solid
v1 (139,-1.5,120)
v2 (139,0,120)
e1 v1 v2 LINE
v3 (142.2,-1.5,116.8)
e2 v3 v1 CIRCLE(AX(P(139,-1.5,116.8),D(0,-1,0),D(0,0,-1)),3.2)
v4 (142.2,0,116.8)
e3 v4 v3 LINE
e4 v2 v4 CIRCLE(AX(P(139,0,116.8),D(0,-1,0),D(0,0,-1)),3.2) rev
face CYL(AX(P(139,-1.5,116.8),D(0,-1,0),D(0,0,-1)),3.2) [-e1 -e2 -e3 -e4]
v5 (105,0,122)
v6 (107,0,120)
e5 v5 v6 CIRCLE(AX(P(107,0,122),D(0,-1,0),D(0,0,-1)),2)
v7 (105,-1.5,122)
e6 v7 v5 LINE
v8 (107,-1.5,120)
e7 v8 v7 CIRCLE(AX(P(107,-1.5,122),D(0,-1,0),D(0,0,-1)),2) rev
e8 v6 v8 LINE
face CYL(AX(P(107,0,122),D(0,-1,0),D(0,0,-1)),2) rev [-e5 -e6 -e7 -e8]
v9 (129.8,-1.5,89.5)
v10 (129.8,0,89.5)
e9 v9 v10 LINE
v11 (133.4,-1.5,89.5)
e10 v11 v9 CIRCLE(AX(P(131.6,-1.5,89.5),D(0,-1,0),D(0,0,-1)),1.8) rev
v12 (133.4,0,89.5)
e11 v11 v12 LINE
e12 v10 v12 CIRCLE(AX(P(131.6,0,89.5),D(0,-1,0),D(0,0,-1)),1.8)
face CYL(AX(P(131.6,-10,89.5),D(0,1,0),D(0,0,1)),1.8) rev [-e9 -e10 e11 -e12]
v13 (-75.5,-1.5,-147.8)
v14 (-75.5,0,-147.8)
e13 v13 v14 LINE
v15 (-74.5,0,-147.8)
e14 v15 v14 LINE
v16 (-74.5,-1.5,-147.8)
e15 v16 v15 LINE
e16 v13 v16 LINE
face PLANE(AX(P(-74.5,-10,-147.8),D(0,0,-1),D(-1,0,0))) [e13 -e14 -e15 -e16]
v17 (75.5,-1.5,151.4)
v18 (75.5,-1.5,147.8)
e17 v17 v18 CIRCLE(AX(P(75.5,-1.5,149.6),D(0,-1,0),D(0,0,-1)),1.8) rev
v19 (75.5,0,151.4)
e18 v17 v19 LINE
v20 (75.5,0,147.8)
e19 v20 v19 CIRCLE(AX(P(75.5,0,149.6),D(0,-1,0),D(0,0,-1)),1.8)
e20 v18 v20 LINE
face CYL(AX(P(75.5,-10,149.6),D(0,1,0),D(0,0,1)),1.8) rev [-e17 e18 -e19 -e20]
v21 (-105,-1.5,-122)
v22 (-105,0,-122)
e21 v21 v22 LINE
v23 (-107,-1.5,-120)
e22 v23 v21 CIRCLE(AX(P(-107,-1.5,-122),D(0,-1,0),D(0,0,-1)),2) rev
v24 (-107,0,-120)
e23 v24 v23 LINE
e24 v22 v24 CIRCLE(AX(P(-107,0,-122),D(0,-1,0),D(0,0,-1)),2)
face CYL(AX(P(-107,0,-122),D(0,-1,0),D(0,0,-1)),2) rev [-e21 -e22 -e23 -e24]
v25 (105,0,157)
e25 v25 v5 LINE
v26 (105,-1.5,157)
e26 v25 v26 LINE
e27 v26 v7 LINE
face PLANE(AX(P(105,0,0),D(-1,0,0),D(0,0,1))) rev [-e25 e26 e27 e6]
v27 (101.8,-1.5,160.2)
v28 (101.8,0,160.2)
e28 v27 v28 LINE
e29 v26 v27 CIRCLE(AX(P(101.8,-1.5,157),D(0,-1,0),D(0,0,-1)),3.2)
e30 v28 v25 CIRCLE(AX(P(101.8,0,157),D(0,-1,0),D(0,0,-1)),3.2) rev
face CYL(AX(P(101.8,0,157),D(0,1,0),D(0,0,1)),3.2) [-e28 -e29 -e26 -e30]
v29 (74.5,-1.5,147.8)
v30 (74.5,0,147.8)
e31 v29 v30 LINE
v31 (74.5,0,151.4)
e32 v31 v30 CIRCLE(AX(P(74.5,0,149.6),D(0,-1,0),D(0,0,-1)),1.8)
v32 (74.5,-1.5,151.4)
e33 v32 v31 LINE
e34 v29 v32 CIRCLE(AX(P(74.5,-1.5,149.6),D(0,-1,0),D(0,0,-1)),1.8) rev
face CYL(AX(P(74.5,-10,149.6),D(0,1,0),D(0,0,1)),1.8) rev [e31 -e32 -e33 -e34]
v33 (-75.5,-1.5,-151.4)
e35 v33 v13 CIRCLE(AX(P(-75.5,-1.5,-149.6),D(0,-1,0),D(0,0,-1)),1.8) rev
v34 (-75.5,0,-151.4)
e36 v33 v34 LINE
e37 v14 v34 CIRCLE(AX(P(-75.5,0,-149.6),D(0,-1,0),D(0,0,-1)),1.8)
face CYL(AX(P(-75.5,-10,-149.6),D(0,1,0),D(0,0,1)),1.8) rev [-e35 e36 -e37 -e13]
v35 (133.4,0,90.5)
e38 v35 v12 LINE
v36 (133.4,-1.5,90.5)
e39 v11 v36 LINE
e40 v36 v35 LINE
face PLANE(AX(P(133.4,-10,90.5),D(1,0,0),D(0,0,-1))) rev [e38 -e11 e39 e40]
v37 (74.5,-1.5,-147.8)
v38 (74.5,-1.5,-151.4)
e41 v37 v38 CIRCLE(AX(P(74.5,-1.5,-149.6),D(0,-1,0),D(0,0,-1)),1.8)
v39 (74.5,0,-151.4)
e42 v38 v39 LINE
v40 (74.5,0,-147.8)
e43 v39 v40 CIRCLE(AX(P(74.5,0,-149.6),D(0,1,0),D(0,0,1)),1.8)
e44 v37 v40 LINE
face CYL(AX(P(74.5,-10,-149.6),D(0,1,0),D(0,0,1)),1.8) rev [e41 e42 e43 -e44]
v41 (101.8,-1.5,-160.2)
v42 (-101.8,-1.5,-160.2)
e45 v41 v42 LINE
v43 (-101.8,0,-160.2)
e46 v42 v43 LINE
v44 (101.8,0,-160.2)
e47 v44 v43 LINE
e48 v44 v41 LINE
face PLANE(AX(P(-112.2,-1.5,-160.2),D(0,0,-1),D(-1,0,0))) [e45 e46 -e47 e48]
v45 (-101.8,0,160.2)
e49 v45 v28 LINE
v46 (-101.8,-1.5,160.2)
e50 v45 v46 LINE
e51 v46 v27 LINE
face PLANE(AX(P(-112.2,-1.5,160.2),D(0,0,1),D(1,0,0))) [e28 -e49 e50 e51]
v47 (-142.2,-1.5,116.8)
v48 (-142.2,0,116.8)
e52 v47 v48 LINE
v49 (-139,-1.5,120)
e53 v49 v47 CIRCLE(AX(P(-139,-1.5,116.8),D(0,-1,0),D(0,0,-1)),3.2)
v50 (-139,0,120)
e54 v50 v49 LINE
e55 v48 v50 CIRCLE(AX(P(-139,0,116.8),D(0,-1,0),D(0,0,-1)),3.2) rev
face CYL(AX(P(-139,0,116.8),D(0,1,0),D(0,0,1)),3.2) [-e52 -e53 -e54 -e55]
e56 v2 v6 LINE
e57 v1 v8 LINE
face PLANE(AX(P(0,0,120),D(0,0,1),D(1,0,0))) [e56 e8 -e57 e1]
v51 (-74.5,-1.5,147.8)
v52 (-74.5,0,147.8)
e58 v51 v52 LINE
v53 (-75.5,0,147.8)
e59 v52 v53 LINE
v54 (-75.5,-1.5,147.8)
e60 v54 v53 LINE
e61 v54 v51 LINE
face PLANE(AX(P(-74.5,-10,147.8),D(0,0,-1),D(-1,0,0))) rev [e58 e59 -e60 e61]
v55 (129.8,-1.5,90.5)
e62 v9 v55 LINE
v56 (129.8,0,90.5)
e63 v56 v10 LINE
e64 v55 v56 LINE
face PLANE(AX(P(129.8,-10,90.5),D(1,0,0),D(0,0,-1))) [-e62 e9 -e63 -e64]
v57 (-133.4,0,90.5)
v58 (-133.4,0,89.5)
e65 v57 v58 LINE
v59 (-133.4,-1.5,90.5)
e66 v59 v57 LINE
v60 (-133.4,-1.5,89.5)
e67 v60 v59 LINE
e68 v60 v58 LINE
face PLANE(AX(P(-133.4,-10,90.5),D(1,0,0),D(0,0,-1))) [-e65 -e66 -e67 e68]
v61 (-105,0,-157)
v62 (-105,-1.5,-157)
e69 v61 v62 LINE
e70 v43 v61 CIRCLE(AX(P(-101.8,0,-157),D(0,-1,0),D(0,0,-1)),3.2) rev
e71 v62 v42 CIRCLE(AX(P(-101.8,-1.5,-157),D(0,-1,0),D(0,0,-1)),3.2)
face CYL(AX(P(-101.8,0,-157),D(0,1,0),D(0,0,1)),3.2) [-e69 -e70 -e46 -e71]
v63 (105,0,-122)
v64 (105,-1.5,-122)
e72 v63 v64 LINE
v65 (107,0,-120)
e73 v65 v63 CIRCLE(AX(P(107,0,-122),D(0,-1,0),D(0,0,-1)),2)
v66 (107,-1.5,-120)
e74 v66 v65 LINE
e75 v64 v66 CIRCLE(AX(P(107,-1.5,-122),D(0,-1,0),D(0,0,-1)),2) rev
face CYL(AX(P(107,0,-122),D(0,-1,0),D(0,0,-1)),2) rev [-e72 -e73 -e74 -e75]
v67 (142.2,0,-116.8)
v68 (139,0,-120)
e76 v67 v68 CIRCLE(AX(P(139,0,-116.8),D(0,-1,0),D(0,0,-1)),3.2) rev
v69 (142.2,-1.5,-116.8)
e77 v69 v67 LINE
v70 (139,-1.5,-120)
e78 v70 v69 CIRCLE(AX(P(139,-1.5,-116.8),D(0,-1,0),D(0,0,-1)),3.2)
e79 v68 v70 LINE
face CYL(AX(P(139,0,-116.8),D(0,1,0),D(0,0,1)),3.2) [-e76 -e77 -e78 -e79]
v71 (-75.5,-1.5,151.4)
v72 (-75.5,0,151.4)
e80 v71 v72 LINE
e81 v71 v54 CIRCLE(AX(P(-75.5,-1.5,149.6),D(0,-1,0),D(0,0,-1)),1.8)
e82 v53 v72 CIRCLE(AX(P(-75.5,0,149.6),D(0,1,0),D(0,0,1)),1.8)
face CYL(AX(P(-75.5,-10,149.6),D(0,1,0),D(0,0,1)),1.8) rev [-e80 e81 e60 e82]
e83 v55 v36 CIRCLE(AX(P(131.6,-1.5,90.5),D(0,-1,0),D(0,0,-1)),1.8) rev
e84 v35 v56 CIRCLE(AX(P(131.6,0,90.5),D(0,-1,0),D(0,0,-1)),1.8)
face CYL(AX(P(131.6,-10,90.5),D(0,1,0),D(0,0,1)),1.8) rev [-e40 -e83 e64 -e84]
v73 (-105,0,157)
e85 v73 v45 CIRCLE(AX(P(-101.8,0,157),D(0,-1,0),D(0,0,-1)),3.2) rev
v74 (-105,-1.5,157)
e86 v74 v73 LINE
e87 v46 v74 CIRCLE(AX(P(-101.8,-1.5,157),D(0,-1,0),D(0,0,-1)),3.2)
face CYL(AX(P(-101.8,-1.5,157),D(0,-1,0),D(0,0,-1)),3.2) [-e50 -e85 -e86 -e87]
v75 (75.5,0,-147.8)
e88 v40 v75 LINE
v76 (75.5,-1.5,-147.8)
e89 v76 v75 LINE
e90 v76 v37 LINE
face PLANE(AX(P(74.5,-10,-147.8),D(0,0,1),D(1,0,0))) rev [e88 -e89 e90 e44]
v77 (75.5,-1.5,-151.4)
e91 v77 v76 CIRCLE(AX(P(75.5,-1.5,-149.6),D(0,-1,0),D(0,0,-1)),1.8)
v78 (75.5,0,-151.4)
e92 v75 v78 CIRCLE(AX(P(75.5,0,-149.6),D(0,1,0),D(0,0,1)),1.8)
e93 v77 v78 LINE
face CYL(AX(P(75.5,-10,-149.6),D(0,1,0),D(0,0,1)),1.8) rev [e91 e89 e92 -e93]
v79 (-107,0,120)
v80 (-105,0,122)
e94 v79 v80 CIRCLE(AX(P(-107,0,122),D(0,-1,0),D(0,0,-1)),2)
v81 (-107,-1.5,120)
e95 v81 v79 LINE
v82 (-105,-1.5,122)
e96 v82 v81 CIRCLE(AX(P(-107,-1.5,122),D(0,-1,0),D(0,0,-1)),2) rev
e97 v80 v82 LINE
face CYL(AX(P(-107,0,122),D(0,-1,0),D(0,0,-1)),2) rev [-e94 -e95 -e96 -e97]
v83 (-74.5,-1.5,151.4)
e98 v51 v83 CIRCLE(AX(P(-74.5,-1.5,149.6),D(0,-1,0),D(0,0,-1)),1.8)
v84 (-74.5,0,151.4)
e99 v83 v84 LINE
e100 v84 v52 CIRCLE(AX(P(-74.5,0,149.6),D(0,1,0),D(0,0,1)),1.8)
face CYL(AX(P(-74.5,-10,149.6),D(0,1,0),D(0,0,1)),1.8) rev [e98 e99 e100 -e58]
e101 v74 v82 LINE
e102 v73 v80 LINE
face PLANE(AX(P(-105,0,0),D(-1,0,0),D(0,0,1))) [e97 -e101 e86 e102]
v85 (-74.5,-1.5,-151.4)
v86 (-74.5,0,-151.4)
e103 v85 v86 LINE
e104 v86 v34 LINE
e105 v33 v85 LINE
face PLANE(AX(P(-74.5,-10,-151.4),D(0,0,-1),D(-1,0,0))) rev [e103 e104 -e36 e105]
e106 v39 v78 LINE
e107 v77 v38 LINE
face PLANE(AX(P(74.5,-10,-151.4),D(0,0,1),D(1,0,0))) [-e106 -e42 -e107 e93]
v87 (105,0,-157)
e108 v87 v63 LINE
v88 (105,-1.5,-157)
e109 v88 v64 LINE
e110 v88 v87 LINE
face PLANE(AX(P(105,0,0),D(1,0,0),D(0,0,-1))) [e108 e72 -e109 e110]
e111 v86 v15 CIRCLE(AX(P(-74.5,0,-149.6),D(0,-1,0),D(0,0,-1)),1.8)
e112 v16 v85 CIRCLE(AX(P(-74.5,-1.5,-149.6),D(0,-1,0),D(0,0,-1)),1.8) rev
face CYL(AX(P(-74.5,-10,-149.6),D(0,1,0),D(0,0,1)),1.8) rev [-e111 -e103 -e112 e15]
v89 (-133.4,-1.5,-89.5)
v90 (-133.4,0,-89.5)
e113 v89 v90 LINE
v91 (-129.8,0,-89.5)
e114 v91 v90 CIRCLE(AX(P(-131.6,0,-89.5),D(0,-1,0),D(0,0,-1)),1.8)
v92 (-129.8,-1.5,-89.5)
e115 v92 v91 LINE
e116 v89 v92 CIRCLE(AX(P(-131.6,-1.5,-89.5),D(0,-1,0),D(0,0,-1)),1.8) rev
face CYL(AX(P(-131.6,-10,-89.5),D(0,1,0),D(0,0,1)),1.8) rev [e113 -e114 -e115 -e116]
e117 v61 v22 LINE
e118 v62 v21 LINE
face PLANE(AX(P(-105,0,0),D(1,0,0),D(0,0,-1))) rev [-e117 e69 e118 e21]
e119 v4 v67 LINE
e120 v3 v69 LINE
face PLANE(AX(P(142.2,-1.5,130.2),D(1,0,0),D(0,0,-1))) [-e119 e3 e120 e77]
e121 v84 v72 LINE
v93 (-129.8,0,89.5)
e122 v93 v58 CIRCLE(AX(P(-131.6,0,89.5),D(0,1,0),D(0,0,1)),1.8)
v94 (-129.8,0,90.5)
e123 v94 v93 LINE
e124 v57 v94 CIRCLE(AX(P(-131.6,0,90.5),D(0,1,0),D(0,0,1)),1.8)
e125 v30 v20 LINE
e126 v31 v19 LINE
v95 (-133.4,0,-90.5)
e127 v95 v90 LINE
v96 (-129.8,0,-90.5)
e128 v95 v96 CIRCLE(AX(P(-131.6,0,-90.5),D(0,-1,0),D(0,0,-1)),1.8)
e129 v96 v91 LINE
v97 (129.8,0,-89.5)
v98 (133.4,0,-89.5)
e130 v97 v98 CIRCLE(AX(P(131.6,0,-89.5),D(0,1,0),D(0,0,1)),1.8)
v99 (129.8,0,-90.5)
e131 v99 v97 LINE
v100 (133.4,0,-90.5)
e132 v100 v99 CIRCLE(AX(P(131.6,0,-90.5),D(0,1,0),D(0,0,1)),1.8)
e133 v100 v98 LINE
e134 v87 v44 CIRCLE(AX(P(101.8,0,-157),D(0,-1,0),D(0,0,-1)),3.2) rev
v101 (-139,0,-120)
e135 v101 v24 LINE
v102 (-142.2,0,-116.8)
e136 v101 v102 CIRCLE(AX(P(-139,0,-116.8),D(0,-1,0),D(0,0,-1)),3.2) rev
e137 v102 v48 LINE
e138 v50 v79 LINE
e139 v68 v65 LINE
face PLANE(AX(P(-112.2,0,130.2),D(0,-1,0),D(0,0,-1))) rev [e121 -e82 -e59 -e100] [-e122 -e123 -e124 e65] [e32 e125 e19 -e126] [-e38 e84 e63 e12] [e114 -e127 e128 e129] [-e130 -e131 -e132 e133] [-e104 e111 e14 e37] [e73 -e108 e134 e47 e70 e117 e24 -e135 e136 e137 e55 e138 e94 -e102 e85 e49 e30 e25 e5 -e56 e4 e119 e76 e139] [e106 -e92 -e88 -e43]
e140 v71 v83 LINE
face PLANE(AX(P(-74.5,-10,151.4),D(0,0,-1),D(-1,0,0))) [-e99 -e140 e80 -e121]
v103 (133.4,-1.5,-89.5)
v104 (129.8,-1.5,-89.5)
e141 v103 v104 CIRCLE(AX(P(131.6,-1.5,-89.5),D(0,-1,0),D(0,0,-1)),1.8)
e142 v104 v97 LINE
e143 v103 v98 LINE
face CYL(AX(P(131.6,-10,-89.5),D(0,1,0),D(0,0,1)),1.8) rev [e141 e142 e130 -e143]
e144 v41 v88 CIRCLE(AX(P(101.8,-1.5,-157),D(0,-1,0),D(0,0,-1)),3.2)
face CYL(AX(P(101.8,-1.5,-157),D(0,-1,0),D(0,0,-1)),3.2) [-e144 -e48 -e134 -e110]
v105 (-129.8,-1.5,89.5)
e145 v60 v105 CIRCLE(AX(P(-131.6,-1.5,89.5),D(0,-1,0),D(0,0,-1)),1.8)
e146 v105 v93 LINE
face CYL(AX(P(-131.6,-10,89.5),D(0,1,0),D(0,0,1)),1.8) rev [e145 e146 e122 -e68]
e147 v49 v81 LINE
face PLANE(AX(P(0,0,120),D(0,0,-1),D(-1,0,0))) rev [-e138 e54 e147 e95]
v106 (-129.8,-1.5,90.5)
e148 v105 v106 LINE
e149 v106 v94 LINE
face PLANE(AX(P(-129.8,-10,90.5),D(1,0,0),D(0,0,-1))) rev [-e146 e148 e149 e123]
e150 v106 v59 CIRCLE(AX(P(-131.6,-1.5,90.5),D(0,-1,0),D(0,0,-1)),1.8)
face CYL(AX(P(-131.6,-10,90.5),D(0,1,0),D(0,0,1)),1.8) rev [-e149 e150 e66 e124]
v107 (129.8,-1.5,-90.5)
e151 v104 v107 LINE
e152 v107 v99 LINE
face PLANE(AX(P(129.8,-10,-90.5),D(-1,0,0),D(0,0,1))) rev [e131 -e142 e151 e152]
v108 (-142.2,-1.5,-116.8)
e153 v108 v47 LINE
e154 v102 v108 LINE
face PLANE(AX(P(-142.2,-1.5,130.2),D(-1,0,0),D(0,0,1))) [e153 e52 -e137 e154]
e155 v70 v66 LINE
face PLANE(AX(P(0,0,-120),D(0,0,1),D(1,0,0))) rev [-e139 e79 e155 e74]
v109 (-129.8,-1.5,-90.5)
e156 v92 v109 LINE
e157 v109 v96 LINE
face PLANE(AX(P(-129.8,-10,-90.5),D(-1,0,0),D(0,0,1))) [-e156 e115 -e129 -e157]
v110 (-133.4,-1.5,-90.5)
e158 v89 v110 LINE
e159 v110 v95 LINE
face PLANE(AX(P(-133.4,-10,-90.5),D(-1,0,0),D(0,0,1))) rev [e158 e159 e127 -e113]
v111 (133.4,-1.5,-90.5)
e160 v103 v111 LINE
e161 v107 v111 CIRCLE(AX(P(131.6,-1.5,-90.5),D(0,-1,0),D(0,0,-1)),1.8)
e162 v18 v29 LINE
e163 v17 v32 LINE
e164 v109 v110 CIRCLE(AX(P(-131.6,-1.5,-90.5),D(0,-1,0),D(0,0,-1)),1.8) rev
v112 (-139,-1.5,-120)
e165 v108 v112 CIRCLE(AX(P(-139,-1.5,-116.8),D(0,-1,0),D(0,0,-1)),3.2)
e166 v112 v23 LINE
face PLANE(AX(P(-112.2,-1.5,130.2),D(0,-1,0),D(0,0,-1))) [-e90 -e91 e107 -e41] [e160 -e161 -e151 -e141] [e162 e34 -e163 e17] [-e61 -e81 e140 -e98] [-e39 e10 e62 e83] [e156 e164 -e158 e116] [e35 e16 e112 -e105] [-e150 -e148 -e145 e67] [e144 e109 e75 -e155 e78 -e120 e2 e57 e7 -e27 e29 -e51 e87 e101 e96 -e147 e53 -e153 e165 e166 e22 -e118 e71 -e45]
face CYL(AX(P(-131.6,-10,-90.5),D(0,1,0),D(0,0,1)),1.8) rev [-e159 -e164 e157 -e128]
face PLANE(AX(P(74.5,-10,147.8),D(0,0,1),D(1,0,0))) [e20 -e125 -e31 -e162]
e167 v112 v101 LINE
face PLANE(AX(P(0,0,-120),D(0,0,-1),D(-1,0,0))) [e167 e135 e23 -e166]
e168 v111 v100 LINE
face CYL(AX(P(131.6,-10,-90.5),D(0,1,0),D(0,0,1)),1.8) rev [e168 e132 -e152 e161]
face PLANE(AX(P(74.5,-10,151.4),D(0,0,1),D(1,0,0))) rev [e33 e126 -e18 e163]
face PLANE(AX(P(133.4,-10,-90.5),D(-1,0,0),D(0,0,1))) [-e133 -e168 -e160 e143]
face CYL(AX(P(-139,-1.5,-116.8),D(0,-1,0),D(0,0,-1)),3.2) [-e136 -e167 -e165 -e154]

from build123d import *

# Parameters (mm, degrees)
SM_BASE_FLANGE_1_DEPTH = 1.5
CUT_EXTRUDE_1_DEPTH    = 215.212814743
FILLET_1_R             = 3.2
FILLET_3_R             = 2
CUT_EXTRUDE_2_DEPTH    = 10


# Sheet-metal steps are written as plain solids
with BuildPart() as part:
    # Sketch 1 → Базовая кромка1 (new body)
    with BuildSketch(Plane(origin=(0, 0, 0), x_dir=(1, 0, 0), z_dir=(0, 1, 0))):
        with BuildLine():
            Line((-112.2, -160.2), (112.2, -160.2))
            ThreePointArc((112.2, -160.2), (133.413203436, -151.413203436), (142.2, -130.2))
            Line((142.2, -130.2), (142.2, 130.2))
            ThreePointArc((142.2, 130.2), (133.413203436, 151.413203436), (112.2, 160.2))
            Line((112.2, 160.2), (-112.2, 160.2))
            ThreePointArc((-112.2, 160.2), (-133.413203436, 151.413203436), (-142.2, 130.2))
            Line((-142.2, 130.2), (-142.2, -130.2))
            ThreePointArc((-142.2, -130.2), (-133.413203436, -151.413203436), (-112.2, -160.2))
        make_face()
    extrude(amount=-SM_BASE_FLANGE_1_DEPTH)

    # Sketch 2 → Вырез-Вытянуть1 (cut, through all)
    with BuildSketch(Plane.XZ.offset(1.5)):
        with BuildLine():
            Line((105, 120), (142.2, 120))
            Line((142.2, 120), (142.2, 130.2))
            ThreePointArc((142.2, 130.2), (133.413203436, 151.413203436), (112.2, 160.2))
            Line((112.2, 160.2), (105, 160.2))
            Line((105, 160.2), (105, 120))
        make_face()
        with BuildLine():
            Line((142.2, -130.2), (142.2, -120))
            Line((142.2, -120), (105, -120))
            Line((105, -120), (105, -160.2))
            Line((105, -160.2), (112.2, -160.2))
            ThreePointArc((112.2, -160.2), (133.413203436, -151.413203436), (142.2, -130.2))
        make_face()
        with BuildLine():
            Line((-112.2, -160.2), (-105, -160.2))
            Line((-105, -160.2), (-105, -120))
            Line((-105, -120), (-142.2, -120))
            Line((-142.2, -120), (-142.2, -130.2))
            ThreePointArc((-142.2, -130.2), (-133.413203436, -151.413203436), (-112.2, -160.2))
        make_face()
        with BuildLine():
            Line((-105, 120), (-105, 160.2))
            Line((-105, 160.2), (-112.2, 160.2))
            ThreePointArc((-112.2, 160.2), (-133.413203436, 151.413203436), (-142.2, 130.2))
            Line((-142.2, 130.2), (-142.2, 120))
            Line((-142.2, 120), (-105, 120))
        make_face()
    extrude(amount=-CUT_EXTRUDE_1_DEPTH, mode=Mode.SUBTRACT)

    # Скругление1
    fillet_1_edges = [part.edges().sort_by_distance(p)[0] for p in [
        (-142.2, -0.75, 120),
        (-105, -0.75, 160.2),
        (-105, -0.75, -160.2),
        (-142.2, -0.75, -120),
        (105, -0.75, -160.2),
        (142.2, -0.75, -120),
        (105, -0.75, 160.2),
        (142.2, -0.75, 120),
    ]]
    fillet(fillet_1_edges, radius=FILLET_1_R)

    # Скругление3
    fillet_3_edges = [part.edges().sort_by_distance(p)[0] for p in [
        (-105, -0.75, 120),
        (-105, -0.75, -120),
        (105, -0.75, -120),
        (105, -0.75, 120),
    ]]
    fillet(fillet_3_edges, radius=FILLET_3_R)

    # Эскиз4 → Вырез-Вытянуть2 (cut)
    with BuildSketch(Plane(origin=(0, 0, 0), x_dir=(1, 0, 0), z_dir=(0, 1, 0))):
        with BuildLine():
            Line((-133.4, -90.5), (-133.4, -89.5))
            ThreePointArc((-133.4, -89.5), (-131.6, -87.7), (-129.8, -89.5))
            Line((-129.8, -89.5), (-129.8, -90.5))
            ThreePointArc((-129.8, -90.5), (-131.6, -92.3), (-133.4, -90.5))
        make_face()
        with BuildLine():
            Line((-74.5, -151.4), (-75.5, -151.4))
            ThreePointArc((-75.5, -151.4), (-77.3, -149.6), (-75.5, -147.8))
            Line((-75.5, -147.8), (-74.5, -147.8))
            ThreePointArc((-74.5, -147.8), (-72.7, -149.6), (-74.5, -151.4))
        make_face()
        with BuildLine():
            Line((-74.5, 151.4), (-75.5, 151.4))
            ThreePointArc((-75.5, 151.4), (-77.3, 149.6), (-75.5, 147.8))
            Line((-75.5, 147.8), (-74.5, 147.8))
            ThreePointArc((-74.5, 147.8), (-72.7, 149.6), (-74.5, 151.4))
        make_face()
        with BuildLine():
            Line((-133.4, 90.5), (-133.4, 89.5))
            ThreePointArc((-133.4, 89.5), (-131.6, 87.7), (-129.8, 89.5))
            Line((-129.8, 89.5), (-129.8, 90.5))
            ThreePointArc((-129.8, 90.5), (-131.6, 92.3), (-133.4, 90.5))
        make_face()
        with BuildLine():
            Line((74.5, 151.4), (75.5, 151.4))
            ThreePointArc((75.5, 151.4), (77.3, 149.6), (75.5, 147.8))
            Line((75.5, 147.8), (74.5, 147.8))
            ThreePointArc((74.5, 147.8), (72.7, 149.6), (74.5, 151.4))
        make_face()
        with BuildLine():
            Line((133.4, 90.5), (133.4, 89.5))
            ThreePointArc((133.4, 89.5), (131.6, 87.7), (129.8, 89.5))
            Line((129.8, 89.5), (129.8, 90.5))
            ThreePointArc((129.8, 90.5), (131.6, 92.3), (133.4, 90.5))
        make_face()
        with BuildLine():
            Line((133.4, -90.5), (133.4, -89.5))
            ThreePointArc((133.4, -89.5), (131.6, -87.7), (129.8, -89.5))
            Line((129.8, -89.5), (129.8, -90.5))
            ThreePointArc((129.8, -90.5), (131.6, -92.3), (133.4, -90.5))
        make_face()
        with BuildLine():
            Line((74.5, -151.4), (75.5, -151.4))
            ThreePointArc((75.5, -151.4), (77.3, -149.6), (75.5, -147.8))
            Line((75.5, -147.8), (74.5, -147.8))
            ThreePointArc((74.5, -147.8), (72.7, -149.6), (74.5, -151.4))
        make_face()
    extrude(amount=-CUT_EXTRUDE_2_DEPTH, mode=Mode.SUBTRACT)


solid = part.part
